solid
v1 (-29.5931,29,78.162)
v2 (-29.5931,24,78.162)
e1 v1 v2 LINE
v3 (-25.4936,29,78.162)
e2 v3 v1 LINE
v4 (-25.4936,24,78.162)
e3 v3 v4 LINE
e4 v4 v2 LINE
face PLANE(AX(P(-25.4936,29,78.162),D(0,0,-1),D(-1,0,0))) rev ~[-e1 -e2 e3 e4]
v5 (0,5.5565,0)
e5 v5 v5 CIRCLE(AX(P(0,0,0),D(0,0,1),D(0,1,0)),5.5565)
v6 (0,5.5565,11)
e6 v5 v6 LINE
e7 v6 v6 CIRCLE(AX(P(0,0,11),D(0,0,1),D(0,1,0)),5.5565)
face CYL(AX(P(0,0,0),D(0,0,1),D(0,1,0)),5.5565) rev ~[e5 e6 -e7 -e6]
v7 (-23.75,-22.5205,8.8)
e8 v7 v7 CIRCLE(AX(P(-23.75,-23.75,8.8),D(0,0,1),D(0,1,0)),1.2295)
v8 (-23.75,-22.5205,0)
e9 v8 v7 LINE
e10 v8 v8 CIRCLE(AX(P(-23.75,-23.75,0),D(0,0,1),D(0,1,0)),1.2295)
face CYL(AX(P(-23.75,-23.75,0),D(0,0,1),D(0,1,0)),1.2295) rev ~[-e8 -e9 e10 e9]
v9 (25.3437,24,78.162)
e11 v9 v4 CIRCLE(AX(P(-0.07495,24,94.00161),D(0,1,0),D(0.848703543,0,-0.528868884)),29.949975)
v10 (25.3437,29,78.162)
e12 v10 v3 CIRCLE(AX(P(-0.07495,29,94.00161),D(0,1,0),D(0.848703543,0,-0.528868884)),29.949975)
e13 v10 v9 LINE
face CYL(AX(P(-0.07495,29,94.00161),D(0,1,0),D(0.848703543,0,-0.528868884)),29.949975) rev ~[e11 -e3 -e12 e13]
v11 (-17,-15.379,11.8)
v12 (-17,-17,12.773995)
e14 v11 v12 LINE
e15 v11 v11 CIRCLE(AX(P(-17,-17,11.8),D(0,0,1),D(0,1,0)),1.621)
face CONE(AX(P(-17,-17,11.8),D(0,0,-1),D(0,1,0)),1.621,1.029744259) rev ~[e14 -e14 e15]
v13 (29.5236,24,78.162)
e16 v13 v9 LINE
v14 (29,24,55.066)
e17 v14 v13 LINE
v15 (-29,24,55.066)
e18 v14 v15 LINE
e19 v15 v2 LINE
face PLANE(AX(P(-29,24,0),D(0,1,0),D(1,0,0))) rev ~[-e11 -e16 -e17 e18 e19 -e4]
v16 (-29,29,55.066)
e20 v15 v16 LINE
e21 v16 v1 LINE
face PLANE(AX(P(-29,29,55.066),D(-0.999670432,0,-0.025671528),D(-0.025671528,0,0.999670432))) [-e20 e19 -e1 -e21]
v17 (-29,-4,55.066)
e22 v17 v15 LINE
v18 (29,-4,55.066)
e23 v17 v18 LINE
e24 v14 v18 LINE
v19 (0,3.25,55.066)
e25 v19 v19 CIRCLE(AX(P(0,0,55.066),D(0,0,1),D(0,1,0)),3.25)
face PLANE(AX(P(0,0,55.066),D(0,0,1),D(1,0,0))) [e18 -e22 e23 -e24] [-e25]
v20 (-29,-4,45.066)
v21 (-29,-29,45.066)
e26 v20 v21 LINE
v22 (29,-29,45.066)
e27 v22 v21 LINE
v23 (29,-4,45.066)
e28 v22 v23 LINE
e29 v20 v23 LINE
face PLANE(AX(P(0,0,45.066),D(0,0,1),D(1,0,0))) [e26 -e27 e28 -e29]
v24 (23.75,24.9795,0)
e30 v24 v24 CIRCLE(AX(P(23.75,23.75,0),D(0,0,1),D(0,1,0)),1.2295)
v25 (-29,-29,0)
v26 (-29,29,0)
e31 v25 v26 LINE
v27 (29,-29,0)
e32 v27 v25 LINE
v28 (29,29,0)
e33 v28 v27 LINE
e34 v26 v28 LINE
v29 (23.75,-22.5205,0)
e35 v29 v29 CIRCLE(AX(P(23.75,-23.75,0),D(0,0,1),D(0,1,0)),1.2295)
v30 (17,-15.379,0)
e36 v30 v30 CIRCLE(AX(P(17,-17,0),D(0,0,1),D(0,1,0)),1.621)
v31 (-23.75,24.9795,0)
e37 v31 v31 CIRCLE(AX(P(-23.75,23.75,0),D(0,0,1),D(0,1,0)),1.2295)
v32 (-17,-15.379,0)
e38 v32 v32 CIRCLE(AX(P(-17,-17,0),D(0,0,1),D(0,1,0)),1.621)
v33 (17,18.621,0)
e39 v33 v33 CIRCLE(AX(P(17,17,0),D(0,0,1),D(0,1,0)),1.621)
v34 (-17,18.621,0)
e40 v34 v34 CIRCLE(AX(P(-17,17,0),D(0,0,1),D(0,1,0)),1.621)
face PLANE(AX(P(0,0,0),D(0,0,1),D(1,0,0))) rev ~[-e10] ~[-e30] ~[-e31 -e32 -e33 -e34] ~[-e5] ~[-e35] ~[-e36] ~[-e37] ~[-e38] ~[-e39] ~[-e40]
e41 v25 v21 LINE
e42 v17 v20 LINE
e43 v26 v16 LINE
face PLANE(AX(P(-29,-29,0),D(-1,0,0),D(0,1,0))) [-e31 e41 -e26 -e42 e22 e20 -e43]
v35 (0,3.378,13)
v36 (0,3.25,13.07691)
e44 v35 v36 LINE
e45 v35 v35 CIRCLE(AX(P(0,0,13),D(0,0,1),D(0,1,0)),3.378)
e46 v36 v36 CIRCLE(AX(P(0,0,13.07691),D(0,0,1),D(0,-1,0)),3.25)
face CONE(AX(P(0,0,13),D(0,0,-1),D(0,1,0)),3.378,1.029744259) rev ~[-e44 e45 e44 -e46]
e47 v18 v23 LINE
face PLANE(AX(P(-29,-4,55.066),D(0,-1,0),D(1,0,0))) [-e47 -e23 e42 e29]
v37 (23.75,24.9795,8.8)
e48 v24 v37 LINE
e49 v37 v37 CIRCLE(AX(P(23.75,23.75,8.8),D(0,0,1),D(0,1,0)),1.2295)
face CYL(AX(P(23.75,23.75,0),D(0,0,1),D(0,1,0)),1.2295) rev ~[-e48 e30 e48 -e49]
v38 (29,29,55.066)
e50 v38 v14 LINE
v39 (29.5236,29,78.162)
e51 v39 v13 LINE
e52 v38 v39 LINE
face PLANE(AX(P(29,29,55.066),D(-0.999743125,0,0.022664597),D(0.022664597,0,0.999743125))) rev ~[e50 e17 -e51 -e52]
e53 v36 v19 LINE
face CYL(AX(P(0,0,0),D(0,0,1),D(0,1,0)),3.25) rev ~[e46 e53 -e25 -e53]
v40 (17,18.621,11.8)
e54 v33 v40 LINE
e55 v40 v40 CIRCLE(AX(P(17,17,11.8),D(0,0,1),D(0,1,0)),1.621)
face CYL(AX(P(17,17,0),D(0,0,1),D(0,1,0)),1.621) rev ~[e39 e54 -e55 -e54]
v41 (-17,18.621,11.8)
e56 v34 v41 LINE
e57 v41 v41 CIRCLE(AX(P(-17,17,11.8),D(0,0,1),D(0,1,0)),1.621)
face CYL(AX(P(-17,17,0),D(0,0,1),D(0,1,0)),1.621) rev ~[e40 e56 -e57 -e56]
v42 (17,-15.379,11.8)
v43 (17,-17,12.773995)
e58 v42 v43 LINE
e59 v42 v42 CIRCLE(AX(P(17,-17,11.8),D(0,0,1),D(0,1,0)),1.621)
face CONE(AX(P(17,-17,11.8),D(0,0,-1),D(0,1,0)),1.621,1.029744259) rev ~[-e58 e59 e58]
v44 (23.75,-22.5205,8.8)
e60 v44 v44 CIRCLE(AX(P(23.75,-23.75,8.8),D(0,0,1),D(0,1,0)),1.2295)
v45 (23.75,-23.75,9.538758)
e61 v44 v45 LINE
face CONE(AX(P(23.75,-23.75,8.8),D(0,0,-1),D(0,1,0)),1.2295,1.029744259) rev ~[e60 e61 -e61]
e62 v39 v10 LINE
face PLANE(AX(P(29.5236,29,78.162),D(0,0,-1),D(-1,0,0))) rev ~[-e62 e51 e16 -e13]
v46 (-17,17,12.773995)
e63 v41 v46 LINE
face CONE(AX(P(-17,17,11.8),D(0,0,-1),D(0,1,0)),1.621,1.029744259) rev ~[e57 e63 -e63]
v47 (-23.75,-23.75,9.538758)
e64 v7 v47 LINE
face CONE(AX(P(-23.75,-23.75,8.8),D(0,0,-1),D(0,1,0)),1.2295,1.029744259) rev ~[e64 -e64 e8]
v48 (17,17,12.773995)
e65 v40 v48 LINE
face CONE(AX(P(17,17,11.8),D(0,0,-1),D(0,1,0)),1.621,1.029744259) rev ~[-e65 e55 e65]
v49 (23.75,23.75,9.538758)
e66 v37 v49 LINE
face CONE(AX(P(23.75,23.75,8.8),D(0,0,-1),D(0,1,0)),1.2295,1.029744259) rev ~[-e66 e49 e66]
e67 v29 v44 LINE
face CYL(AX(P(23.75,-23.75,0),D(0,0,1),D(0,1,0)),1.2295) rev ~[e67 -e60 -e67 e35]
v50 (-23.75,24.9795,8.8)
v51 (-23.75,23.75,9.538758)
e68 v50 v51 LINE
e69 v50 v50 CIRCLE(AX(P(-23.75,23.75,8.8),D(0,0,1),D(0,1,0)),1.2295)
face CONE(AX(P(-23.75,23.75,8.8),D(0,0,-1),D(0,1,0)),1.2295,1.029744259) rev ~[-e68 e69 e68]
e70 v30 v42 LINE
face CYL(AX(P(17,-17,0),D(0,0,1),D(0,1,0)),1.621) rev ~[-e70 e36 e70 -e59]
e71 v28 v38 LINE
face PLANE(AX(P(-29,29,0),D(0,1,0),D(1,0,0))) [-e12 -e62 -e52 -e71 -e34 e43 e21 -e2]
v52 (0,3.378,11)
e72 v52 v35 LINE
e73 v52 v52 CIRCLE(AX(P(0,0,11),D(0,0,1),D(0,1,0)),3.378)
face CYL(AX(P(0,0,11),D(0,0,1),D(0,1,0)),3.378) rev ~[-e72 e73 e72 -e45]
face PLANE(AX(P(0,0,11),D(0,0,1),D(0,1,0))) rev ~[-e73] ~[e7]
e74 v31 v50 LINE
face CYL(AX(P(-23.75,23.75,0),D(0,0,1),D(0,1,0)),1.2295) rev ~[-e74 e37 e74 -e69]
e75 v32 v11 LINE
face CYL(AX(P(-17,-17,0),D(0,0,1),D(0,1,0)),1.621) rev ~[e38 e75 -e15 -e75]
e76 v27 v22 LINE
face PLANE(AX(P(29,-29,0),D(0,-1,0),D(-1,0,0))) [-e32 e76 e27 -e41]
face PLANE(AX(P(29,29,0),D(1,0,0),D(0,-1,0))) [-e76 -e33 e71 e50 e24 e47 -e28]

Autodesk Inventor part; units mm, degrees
ref_plane "YZ Plane" through (0, 0, 0) normal (1, 0, 0) x (0, 1, 0)
ref_plane "XZ Plane" through (0, 0, 0) normal (0, 1, 0) x (-1, 0, 0)
ref_plane "XY Plane" through (0, 0, 0) normal (0, 0, 1) x (1, 0, 0)
sketch "Sketch1" plane through (0, 0, 0) normal (0, 0, 1) x (1, 0, 0)
  line L0 (29, -29) -> (-29, -29)
  line L1 (-29, -29) -> (-29, 29)
  line L2 (-29, 29) -> (29, 29)
  line L3 (29, 29) -> (29, -29)
  line L4 (29, -29) -> (-29, 29) construction
  line L5 (-29, -29) -> (29, 29) construction
  point P0 (0, 0)
  point P1 (0, 0)
  dimension "d0" = 58
  dimension "d1" = 58
extrude "Extrusion1" add sketch "Sketch1" along normal blind 55.066
sketch "Sketch2" plane through (0, 0, 55.066) normal (0, 0, 1) x (1, 0, 0)
  line L0 (-29, 29) -> (-29, -29) projected
  line L1 (29, -29) -> (29, 29) projected
  line L2 (-29, -4) -> (29, -4)
  line L3 (29, -4) -> (29, -29)
  line L4 (29, -29) -> (-29, -29)
  line L5 (-29, -29) -> (-29, -4)
  point P0 (0, 0)
extrude "Extrusion2" cut sketch "Sketch2" against normal blind 10
hole "Hole1" at (0, 0, 0) direction (0, 0, 1) diameter 6.5 end through all
sketch "Sketch3" plane through (-29, 29, 0) normal (0, 1, 0) x (1, 0, 0)
  line L0 (0, 0) -> (58, 0) projected
  line L1 (0, 0) -> (0, -55.066) projected
  line L2 (58, -55.066) -> (0, -55.066) projected
  line L3 (58, 0) -> (58, -55.066) projected
  arc A0 (3.5064, -78.162) -> (54.3437, -78.162) centre (28.925, -94.0017) ccw
  line L4 (58, -55.066) -> (58, -45.066) projected
  line L5 (58, -55.066) -> (58.8673, -93.3229)
  line L6 (0, -45.066) -> (0, -55.066) projected
  line L7 (0, -55.066) -> (-1.0173, -94.6805)
  line L8 (58.5236, -78.162) -> (-0.5931, -78.162)
  arc A1 (54.3437, -78.162) -> (3.5064, -78.162) centre (28.925, -94.0017) ccw
  point P0 (29, 0)
  dimension "d13" = 59.9
extrude "Extrusion3" add sketch "Sketch3" against normal blind 5 contours L2 L5 L8 A1 L7
hole "Hole2" at (0, 0, 0) direction (0, 0, 1) diameter 6.756 depth 13 tip angle 118 counterbore diameter 11.113 counterbore depth 11 clearance for "Socket Head Cap Screw" size "1/4" standard "Ansi Unified Screw Threads"
sketch "Sketch4" plane through (0, 0, 0) normal (0, 0, -1) x (-1, 0, 0)
  line L0 (-23.75, 23.75) -> (23.75, 23.75)
  line L1 (23.75, 23.75) -> (23.75, -23.75)
  line L2 (23.75, -23.75) -> (-23.75, -23.75)
  line L3 (-23.75, -23.75) -> (-23.75, 23.75)
  line L4 (-23.75, 23.75) -> (23.75, -23.75) construction
  line L5 (23.75, 23.75) -> (-23.75, -23.75) construction
  line L6 (-14.6492, 0) -> (14.3408, 0)
  point P0 (0, 0)
  point P1 (-17, -17)
  point P2 (17, -17)
  point P3 (-17, 17)
  point P4 (17, 17)
  dimension "d23" = 47.5
  dimension "d24" = 47.5
  dimension "d33" = 34
  dimension "d36" = 34
  dimension "d39" = 34
hole "Hole3" at (-23.75, -23.75, 0) at (23.75, -23.75, 0) at (-23.75, 23.75, 0) at (23.75, 23.75, 0) direction (0, 0, 1) diameter 2.459 depth 8.8 tip angle 118 thread size "M3x0.5" class "6H" standard "ANSI Metric M Profile"
hole "Hole4" at (17, -17, 0) at (17, 17, 0) at (-17, 17, 0) at (-17, -17, 0) direction (0, 0, 1) diameter 3.242 depth 11.8 tip angle 118 thread size "M4x0.7" class "6H" standard "ANSI Metric M Profile"
properties part number "Iris15-XT66P2M_H94mm(axis2base)"
